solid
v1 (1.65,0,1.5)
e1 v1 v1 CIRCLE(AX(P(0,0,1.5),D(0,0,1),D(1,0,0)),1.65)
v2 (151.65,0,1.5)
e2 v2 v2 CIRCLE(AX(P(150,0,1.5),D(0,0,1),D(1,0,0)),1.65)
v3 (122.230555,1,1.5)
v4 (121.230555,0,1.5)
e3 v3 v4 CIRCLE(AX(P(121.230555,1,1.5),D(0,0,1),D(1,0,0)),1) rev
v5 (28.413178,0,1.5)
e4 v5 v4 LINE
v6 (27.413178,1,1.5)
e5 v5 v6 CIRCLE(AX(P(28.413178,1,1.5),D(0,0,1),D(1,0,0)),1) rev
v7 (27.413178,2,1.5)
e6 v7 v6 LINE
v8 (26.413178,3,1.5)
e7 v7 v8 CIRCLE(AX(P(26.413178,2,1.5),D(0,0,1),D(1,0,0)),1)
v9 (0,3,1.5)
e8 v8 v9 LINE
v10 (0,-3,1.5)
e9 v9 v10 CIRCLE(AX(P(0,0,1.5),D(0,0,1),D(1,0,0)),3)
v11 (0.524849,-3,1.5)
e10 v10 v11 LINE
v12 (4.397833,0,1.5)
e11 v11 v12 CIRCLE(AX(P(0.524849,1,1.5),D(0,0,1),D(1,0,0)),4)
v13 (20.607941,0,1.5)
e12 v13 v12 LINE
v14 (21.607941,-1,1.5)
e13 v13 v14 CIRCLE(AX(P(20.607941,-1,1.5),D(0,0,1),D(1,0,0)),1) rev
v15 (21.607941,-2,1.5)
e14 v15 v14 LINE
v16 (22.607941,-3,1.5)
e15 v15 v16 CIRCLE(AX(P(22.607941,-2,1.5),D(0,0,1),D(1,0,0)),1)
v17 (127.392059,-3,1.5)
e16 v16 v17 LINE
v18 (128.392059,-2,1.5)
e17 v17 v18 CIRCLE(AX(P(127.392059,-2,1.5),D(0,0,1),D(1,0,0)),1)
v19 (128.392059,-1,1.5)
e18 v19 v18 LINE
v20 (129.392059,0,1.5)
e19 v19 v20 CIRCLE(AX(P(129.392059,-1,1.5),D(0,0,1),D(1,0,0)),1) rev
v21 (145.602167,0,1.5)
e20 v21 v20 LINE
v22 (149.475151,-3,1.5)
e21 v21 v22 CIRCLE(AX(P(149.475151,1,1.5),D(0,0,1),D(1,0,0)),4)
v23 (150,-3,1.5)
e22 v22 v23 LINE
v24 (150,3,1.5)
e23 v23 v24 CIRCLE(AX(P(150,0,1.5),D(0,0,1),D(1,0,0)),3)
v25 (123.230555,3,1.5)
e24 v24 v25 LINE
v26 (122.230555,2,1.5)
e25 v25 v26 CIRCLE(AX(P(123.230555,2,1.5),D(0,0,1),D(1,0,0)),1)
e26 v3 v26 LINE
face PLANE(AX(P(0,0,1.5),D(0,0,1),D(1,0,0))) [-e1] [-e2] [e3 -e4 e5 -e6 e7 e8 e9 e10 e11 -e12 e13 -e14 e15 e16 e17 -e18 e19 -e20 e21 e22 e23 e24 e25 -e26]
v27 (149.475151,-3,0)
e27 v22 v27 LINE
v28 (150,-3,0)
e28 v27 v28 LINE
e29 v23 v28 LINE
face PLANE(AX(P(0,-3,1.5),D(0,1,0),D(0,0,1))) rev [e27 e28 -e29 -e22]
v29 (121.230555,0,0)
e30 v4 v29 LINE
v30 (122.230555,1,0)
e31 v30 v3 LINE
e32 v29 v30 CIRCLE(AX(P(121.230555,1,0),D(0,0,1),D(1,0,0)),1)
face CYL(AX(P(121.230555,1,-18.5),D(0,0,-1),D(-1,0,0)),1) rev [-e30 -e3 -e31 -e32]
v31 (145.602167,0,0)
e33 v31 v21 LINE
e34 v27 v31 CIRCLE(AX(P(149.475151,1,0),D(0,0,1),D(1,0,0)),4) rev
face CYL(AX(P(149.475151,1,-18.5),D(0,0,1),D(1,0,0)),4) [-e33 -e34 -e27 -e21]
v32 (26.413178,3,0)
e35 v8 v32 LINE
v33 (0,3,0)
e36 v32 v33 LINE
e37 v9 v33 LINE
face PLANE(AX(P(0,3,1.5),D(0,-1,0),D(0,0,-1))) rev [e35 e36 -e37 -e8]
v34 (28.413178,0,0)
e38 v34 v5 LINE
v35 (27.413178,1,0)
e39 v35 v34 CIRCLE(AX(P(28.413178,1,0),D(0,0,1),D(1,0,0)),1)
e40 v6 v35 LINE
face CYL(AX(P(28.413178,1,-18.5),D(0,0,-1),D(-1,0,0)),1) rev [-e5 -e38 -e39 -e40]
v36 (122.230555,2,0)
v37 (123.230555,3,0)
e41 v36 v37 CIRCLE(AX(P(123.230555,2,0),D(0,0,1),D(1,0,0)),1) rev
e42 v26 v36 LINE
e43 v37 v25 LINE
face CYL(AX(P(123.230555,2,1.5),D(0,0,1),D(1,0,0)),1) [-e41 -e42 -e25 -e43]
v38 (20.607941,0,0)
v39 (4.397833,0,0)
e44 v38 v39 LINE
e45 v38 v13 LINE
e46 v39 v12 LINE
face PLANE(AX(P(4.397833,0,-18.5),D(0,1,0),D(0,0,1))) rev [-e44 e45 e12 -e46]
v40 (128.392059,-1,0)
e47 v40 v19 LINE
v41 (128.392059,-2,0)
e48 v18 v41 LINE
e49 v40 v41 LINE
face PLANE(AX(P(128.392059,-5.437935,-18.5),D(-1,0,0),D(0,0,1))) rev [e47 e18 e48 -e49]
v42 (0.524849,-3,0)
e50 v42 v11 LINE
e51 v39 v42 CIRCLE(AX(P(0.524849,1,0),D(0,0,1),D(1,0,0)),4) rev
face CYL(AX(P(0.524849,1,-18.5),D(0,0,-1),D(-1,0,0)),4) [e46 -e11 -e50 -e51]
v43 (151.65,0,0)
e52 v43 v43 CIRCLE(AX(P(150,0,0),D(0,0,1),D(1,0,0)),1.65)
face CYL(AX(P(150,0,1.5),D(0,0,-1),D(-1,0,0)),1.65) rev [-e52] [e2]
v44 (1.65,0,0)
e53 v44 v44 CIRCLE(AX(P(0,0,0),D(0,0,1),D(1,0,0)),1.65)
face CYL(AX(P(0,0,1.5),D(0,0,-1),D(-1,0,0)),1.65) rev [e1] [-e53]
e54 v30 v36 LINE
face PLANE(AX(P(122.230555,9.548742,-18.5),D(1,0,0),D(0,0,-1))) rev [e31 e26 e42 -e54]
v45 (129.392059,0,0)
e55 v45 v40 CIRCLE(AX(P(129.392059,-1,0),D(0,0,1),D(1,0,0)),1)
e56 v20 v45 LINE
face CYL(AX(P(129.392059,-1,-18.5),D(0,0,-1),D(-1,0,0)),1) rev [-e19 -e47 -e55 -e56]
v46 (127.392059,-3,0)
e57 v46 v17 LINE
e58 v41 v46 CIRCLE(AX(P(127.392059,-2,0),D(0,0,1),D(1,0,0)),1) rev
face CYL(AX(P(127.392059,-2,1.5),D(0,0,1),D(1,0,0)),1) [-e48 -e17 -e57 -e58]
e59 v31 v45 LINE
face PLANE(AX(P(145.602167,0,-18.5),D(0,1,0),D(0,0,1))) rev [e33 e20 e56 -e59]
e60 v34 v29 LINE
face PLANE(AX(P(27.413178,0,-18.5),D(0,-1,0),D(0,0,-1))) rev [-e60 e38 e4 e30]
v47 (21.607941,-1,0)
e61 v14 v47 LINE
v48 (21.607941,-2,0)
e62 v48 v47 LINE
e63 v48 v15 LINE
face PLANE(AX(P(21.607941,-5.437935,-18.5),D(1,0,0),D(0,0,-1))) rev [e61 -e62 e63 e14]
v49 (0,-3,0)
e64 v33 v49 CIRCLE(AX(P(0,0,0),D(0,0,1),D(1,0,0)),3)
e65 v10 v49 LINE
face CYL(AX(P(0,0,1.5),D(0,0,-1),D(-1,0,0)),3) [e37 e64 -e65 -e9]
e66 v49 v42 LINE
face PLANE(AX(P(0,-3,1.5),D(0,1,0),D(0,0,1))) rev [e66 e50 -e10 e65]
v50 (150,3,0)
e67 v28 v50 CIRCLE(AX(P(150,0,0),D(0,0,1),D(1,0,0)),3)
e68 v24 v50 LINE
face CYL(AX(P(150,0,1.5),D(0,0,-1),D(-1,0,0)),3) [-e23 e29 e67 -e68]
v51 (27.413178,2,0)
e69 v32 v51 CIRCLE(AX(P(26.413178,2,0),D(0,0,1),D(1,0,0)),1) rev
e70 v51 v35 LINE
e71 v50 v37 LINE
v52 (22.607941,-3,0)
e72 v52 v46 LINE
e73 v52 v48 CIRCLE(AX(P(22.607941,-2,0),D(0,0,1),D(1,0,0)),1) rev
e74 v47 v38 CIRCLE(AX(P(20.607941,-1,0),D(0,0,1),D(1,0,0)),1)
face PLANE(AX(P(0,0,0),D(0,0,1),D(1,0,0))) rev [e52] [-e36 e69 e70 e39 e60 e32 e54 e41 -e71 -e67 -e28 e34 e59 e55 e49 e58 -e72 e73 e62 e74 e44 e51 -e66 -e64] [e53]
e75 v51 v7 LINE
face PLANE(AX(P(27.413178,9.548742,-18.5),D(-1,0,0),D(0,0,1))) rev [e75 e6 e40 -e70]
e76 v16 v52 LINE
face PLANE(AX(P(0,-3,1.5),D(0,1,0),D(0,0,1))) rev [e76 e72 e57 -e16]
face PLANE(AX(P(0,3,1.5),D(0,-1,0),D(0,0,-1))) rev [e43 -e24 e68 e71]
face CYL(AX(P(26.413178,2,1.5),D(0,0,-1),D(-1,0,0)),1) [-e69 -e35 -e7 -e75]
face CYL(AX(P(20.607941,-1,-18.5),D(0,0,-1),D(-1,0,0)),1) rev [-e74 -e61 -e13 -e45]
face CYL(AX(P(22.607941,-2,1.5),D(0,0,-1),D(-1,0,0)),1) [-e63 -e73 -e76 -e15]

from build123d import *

# Parameters (mm, degrees)
SKETCH_1_R          = 5.5
EXTRUDE_1_DEPTH     = 5
SCALE_1_SCALE       = 0.3
SKETCH_3_W          = 17.210108286
SKETCH_3_H          = 5.437935386
CUT_EXTRUDE_2_DEPTH = 20
FILLET_1_R          = 4
FILLET_2_R          = 1
SKETCH_4_W          = 94.817377104
SKETCH_4_H          = 9.548741528
CUT_EXTRUDE_3_DEPTH = 20
FILLET_3_R          = 1


with BuildPart() as part:
    # 草图1 → 凸台-拉伸1 (new body)
    with BuildSketch(Plane.XY):
        with BuildLine():
            Line((0, 10), (500, 10))
            ThreePointArc((500, 10), (510, 0), (500, -10))
            Line((500, -10), (0, -10))
            ThreePointArc((0, -10), (-10, 0), (0, 10))
        make_face()
        Circle(SKETCH_1_R, mode=Mode.SUBTRACT)
        with Locations((500, 0)):
            Circle(SKETCH_1_R, mode=Mode.SUBTRACT)
    extrude(amount=EXTRUDE_1_DEPTH)


with BuildPart() as part_1:
    # 缩放比例1: scaled about (0, 0, 0)
    add(part.part.scale(SCALE_1_SCALE))

    # 草图3 → 切除-拉伸2 (cut)
    with BuildSketch(Plane.XY.offset(1.5)):
        with Locations((13.002886653, -2.718967693)):
            Rectangle(SKETCH_3_W, SKETCH_3_H)
        with Locations((136.997113347, -2.718967693)):
            Rectangle(SKETCH_3_W, SKETCH_3_H)
    extrude(amount=-CUT_EXTRUDE_2_DEPTH, mode=Mode.SUBTRACT)

    # 圆角1
    # the kernel refuses this fillet: 4 mm, written as the material it takes off along each edge
    with BuildSketch(Plane(origin=(145.60216749, -3, 11.182458366), x_dir=(1, 0, 0), z_dir=(0, 0, -1))) as fillet_1_piece_1:
        with BuildLine():
            CenterArc((3.872983346, -4), FILLET_1_R, 90, 75.522487814)
            Line((0, -3), (-0.077459667, -2.98))
            ThreePointArc((-0.077459667, -2.98), (-0.08, -1.5), (-0.08, 0))
            Line((-0.08, 0), (0, 0.08))
            Line((0, 0.08), (3.872983346, 0.08))
            Line((3.872983346, 0.08), (3.872983346, 0))
        make_face()
    extrude(amount=20.864916731, mode=Mode.SUBTRACT)
    with BuildSketch(Plane(origin=(4.39783251, -3, 11.182458366), x_dir=(-1, 0, 0), z_dir=(0, 0, -1))) as fillet_1_piece_2:
        with BuildLine():
            CenterArc((3.872983346, 4), FILLET_1_R, 194.477512186, 75.522487814)
            Line((0, 3), (-0.077459667, 2.98))
            ThreePointArc((-0.077459667, 2.98), (-0.08, 1.5), (-0.08, 0))
            Line((-0.08, 0), (0, -0.08))
            Line((0, -0.08), (3.872983346, -0.08))
            Line((3.872983346, -0.08), (3.872983346, 0))
        make_face()
    extrude(amount=20.864916731, mode=Mode.SUBTRACT)

    # 圆角2
    fillet_2_edges = [part_1.edges().sort_by_distance(p)[0] for p in [
        (128.392059204, -3, 0.75),
        (21.607940796, -3, 0.75),
        (21.607940796, 0, 0.75),
        (128.392059204, 0, 0.75),
    ]]
    fillet(fillet_2_edges, radius=FILLET_2_R)

    # 草图4 → 切除-拉伸3 (cut)
    with BuildSketch(Plane.XY.offset(1.5)):
        with Locations((74.821866685, 4.774370764)):
            Rectangle(SKETCH_4_W, SKETCH_4_H)
    extrude(amount=-CUT_EXTRUDE_3_DEPTH, mode=Mode.SUBTRACT)

    # 圆角3
    fillet_3_edges = [part_1.edges().sort_by_distance(p)[0] for p in [
        (122.230555237, 3, 0.75),
        (27.413178133, 3, 0.75),
        (122.230555237, 0, 0.75),
        (27.413178133, 0, 0.75),
    ]]
    fillet(fillet_3_edges, radius=FILLET_3_R)


solid = part_1.part
